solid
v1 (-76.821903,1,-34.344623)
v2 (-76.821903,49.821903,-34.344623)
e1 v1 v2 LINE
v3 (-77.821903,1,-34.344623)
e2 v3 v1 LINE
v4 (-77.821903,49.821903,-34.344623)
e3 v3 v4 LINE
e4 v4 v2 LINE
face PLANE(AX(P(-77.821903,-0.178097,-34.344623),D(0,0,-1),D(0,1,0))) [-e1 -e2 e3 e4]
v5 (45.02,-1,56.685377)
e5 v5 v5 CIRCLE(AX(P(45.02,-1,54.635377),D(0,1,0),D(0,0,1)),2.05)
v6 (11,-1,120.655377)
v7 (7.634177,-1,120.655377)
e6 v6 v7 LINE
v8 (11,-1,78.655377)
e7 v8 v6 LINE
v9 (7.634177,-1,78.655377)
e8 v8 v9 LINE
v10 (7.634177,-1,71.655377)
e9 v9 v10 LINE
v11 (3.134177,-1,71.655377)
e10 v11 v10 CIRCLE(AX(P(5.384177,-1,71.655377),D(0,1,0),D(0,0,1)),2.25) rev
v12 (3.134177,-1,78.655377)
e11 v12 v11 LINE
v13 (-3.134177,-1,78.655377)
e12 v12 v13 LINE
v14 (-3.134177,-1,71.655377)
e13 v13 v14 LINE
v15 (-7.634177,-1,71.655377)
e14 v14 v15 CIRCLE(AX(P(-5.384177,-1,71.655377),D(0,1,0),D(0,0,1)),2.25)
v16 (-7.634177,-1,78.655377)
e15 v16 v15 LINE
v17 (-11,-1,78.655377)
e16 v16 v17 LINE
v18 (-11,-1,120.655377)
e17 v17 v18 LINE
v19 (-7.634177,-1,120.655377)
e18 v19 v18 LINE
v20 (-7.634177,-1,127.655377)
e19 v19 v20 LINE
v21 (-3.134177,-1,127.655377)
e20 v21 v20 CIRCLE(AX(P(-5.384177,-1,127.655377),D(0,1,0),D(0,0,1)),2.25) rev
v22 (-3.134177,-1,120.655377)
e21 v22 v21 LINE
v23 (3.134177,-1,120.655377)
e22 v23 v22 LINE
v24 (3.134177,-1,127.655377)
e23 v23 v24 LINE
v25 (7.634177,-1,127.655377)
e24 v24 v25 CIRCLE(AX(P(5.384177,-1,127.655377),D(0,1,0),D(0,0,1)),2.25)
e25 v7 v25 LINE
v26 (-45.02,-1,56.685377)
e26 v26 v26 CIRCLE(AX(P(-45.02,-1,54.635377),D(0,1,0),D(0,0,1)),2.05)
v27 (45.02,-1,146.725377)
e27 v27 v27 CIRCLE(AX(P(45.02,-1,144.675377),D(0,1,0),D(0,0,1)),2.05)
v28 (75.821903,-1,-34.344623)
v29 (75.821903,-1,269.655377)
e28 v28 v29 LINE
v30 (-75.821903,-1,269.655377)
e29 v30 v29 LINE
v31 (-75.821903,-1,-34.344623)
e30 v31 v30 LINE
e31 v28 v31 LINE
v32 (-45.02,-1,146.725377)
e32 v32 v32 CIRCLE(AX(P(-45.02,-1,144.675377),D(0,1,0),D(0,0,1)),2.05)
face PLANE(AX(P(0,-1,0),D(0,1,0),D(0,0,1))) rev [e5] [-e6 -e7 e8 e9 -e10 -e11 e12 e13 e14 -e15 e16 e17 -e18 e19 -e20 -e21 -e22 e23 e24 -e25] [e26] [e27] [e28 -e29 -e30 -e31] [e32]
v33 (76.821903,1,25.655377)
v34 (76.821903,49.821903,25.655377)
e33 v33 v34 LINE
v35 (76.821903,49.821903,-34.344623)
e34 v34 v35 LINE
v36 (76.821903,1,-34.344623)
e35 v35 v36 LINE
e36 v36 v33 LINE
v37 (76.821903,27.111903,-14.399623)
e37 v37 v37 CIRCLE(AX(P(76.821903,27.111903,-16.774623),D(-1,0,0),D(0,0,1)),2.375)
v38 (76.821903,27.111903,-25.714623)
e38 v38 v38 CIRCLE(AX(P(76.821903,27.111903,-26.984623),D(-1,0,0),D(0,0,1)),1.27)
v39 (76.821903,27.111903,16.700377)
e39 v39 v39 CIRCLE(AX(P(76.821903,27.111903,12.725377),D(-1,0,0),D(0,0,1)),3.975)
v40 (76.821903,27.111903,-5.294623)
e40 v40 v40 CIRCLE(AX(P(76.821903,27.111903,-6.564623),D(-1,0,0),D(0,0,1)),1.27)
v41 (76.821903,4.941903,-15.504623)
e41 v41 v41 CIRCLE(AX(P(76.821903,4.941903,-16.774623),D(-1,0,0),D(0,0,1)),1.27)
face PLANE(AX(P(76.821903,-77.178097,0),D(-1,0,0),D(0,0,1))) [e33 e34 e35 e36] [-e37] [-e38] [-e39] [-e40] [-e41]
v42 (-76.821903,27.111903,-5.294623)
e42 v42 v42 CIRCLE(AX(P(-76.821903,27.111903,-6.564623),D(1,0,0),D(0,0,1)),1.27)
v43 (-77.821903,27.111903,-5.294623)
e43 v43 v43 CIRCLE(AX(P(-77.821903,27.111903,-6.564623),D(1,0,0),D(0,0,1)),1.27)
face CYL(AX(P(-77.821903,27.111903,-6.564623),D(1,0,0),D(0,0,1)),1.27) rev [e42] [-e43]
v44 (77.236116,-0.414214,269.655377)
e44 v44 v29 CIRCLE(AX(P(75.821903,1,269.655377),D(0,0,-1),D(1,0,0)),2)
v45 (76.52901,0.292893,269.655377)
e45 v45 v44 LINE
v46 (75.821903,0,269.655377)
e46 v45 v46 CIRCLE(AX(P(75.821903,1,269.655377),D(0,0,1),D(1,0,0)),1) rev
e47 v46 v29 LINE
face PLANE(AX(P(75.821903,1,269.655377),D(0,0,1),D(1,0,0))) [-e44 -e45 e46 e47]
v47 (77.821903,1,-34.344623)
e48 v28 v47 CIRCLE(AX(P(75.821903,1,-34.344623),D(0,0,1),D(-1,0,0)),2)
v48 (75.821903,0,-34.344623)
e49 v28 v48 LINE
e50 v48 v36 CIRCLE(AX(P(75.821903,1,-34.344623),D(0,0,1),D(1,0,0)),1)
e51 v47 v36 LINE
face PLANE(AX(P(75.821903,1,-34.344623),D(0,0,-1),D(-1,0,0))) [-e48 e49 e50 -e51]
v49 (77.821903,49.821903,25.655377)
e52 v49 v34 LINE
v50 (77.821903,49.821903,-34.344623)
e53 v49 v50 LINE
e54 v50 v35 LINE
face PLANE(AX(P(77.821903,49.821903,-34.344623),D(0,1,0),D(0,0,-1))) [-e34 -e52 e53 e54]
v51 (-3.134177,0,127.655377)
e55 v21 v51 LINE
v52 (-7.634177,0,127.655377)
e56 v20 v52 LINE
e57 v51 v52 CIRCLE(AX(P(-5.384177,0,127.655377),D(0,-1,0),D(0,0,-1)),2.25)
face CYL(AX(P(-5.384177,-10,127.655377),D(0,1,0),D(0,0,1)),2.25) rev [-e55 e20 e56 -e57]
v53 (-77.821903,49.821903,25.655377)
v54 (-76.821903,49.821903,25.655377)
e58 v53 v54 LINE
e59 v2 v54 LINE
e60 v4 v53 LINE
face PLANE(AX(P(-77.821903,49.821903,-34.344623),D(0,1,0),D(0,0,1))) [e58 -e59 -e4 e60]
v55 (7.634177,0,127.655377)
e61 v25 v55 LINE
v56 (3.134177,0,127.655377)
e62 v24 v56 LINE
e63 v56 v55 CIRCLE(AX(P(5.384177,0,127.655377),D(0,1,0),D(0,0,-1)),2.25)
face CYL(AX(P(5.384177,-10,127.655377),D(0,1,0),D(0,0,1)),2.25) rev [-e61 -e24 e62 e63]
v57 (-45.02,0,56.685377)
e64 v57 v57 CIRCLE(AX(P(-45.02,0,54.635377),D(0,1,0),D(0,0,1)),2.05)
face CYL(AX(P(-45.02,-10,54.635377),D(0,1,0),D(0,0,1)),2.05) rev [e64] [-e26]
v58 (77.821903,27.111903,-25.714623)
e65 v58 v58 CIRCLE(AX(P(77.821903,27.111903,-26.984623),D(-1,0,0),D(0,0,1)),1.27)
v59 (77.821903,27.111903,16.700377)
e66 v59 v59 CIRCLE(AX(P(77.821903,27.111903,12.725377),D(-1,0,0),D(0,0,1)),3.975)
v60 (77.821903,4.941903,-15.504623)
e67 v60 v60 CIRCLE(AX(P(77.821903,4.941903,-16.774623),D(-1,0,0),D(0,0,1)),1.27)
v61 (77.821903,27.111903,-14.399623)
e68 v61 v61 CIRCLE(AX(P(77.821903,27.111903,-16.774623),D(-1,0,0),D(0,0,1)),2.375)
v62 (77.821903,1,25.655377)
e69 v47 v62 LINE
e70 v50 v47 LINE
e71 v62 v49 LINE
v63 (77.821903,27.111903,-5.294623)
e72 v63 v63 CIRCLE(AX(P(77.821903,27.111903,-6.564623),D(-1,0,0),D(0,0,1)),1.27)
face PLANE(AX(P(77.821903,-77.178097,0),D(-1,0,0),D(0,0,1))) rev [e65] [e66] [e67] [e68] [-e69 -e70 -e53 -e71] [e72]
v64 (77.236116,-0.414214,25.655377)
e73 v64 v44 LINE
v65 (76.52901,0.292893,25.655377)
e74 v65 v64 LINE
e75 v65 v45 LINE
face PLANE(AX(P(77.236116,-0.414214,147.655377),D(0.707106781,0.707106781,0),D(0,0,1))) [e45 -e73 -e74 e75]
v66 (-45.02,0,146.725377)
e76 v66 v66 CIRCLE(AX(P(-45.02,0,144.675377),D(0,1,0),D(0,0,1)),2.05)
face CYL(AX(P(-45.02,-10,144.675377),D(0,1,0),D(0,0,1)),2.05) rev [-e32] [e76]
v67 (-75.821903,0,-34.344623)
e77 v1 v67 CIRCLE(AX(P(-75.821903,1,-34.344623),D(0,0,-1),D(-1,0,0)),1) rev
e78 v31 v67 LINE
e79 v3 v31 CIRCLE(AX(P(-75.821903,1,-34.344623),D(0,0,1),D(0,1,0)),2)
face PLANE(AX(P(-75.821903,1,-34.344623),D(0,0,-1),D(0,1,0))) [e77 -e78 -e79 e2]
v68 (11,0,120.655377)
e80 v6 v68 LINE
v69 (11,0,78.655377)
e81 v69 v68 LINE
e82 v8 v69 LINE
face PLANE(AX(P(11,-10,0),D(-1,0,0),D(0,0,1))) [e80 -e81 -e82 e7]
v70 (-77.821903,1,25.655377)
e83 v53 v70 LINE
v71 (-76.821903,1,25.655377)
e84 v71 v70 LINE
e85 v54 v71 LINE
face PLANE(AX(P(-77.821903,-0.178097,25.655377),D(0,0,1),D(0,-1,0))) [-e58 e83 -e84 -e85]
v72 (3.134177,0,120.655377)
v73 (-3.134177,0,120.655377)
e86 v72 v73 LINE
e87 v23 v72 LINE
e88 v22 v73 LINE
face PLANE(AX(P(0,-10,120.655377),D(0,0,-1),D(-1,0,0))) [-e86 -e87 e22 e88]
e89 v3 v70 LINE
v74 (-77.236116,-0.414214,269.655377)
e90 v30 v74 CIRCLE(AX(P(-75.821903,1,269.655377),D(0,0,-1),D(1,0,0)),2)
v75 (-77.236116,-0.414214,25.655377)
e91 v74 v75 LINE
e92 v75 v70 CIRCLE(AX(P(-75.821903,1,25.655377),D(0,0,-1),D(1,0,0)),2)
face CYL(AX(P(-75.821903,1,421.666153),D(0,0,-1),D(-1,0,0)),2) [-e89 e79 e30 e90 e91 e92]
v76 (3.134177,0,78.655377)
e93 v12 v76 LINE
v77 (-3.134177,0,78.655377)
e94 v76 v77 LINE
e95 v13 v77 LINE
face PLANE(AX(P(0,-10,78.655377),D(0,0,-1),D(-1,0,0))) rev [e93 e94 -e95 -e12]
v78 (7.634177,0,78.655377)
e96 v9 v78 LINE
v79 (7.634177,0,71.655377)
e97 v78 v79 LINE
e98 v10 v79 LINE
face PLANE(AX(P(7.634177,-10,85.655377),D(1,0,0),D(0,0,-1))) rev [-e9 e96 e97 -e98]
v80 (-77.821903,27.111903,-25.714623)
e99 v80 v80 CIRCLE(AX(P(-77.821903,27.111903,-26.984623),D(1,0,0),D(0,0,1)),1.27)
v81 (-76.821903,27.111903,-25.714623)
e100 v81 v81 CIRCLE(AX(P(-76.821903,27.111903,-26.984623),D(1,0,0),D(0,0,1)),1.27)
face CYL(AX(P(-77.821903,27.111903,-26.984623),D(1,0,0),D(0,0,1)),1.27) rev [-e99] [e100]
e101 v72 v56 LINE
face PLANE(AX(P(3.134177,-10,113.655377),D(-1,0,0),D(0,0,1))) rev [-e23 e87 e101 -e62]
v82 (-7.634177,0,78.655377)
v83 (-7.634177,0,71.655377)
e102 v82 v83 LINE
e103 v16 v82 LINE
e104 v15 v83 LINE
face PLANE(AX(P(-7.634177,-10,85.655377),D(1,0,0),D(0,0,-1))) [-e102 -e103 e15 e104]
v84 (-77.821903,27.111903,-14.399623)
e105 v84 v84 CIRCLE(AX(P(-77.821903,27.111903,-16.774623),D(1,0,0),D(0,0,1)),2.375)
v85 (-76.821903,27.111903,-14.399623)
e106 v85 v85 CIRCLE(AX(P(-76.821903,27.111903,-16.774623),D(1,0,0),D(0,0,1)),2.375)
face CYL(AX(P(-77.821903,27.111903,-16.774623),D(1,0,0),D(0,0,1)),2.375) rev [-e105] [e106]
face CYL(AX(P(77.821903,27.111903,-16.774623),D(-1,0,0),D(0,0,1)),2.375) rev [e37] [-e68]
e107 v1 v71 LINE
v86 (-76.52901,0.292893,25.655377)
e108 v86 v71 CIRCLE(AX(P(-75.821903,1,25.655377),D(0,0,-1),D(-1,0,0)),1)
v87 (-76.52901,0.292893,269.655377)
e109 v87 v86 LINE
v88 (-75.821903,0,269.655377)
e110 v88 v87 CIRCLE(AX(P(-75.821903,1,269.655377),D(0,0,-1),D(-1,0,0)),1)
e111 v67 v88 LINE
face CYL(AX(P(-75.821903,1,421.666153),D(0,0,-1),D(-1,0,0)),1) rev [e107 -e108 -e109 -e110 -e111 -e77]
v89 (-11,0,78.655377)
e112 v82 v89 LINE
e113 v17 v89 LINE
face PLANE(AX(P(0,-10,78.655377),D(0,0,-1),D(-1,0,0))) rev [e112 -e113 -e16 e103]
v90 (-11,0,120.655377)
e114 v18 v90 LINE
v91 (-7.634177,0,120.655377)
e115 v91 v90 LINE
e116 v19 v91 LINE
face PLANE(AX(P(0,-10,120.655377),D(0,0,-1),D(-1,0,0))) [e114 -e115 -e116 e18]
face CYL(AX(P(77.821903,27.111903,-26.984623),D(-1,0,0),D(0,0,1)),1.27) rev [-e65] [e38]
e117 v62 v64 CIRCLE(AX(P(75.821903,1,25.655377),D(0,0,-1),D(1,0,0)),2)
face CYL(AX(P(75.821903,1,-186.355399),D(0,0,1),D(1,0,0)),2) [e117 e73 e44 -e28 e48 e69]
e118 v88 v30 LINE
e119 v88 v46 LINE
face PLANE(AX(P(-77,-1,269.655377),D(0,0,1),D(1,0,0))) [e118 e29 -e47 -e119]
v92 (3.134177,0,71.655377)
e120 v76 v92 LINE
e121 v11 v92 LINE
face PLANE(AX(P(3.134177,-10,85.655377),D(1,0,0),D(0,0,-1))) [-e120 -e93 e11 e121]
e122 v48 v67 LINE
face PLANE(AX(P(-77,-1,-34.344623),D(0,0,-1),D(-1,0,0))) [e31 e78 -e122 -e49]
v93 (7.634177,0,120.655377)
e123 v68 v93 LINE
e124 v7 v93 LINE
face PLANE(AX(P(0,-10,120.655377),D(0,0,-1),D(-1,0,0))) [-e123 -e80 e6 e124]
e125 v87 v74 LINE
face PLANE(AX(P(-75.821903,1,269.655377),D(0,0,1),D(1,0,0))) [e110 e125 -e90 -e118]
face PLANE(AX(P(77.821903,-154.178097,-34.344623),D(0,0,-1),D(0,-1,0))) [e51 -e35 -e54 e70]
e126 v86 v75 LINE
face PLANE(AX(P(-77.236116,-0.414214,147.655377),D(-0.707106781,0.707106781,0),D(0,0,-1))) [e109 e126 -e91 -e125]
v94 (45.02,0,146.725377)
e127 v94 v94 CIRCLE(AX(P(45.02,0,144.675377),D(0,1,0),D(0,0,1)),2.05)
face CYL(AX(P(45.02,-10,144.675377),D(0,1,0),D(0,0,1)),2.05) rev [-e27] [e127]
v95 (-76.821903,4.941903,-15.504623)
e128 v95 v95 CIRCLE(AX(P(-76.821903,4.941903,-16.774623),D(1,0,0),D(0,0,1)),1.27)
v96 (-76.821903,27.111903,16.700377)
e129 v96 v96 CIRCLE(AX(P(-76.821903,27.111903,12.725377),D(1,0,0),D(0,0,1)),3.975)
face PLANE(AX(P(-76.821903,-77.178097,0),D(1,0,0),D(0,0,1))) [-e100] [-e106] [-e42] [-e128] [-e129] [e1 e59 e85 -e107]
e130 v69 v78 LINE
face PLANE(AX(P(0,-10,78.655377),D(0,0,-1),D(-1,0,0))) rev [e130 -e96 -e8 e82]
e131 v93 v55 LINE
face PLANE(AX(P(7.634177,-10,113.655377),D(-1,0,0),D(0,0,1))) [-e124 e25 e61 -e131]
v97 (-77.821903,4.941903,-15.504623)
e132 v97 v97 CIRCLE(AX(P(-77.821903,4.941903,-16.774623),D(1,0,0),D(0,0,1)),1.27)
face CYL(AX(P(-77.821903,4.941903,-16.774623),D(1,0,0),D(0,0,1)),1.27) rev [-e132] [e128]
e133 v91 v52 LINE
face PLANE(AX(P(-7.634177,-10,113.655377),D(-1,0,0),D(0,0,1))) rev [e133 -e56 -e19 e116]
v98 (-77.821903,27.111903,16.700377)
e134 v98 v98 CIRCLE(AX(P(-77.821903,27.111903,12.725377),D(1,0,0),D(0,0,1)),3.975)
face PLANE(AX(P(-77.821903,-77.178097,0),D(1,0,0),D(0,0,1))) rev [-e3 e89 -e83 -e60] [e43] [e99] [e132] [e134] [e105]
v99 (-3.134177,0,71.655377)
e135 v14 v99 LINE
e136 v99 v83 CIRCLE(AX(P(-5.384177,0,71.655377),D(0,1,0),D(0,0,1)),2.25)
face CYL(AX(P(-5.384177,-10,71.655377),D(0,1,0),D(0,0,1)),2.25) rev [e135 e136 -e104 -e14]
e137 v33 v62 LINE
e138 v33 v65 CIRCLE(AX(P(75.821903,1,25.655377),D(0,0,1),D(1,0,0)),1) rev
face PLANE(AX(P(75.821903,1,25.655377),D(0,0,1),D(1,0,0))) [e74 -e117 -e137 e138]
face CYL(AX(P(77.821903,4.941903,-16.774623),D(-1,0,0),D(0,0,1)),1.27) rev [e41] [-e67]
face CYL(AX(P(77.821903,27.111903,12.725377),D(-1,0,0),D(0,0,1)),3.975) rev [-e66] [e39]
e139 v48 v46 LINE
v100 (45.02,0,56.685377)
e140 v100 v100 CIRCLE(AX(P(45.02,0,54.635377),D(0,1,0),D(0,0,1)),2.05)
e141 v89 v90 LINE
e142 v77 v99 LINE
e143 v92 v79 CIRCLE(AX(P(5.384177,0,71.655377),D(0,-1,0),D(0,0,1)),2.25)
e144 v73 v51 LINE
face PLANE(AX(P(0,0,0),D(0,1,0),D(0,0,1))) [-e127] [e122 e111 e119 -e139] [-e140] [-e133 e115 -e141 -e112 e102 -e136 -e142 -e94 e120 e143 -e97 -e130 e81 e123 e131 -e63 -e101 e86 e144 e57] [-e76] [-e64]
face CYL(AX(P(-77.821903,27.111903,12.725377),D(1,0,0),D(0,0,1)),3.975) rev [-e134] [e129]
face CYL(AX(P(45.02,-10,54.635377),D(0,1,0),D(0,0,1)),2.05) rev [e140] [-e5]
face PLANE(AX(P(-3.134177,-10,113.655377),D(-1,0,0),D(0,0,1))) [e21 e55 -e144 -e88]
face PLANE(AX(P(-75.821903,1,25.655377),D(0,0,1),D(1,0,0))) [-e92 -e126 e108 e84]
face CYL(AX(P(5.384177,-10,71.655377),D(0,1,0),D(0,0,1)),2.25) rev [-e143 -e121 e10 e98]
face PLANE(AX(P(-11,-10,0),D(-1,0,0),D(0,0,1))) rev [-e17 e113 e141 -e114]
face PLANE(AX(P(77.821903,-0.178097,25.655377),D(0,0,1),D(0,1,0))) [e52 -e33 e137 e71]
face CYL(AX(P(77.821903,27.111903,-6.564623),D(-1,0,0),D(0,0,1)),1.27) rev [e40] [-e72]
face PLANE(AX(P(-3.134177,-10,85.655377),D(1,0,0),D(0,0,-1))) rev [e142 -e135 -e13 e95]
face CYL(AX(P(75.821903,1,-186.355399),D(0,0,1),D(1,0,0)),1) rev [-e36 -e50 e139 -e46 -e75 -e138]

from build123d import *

# Parameters (mm, degrees)
SKETCH1_W                    = 154
SKETCH1_H                    = 304
BASE_FLANGE1_DEPTH           = 1
SKETCH4_W                    = 22
SKETCH4_H                    = 42
CUT_EXTRUDE3_DEPTH           = 10
MIRROR2_COPY_1_SKETCH_W      = 22
MIRROR2_COPY_1_SKETCH_H      = 42
MIRROR2_COPY_1_DEPTH         = 10
SKETCH2_R                    = 2.05
CUT_EXTRUDE4_DEPTH           = 10
SKETCH10_W                   = 50
SKETCH10_H                   = 60
BOSS_EXTRUDE2_DEPTH          = 1
SKETCH11_R                   = 3.975
SKETCH11_R_2                 = 1.27
SKETCH11_R_3                 = 2.375
CUT_EXTRUDE6_DEPTH           = 1
SKETCH12_R                   = 1.27
CUT_EXTRUDE7_DEPTH           = 1
SKETCH13_R                   = 3.975
SKETCH13_R_2                 = 1.27
SKETCH13_R_3                 = 2.375
CUT_EXTRUDE8_DEPTH           = 1
SKETCHED_START               = -127
SKETCHED_BEND1_OUTLINE_W     = 1
SKETCHED_BEND1_OUTLINE_H     = 60
SKETCHED_BEND1_DEPTH         = 49.366857245
SKETCHED_START_2             = -77.689070906
SKETCHED_BEND1_2_OUTLINE_W   = 49.821902755
SKETCHED_BEND1_2_OUTLINE_H   = 60
SKETCHED_BEND1_2_OUTLINE_R   = 1.27
SKETCHED_BEND1_2_OUTLINE_R_2 = 2.375
SKETCHED_BEND1_2_OUTLINE_R_3 = 3.975
SKETCHED_BEND1_2_DEPTH       = 0.867168151
SKETCHED_START_3             = -77
SKETCHED_BEND1_3_OUTLINE_W   = 49.821902755
SKETCHED_BEND1_3_OUTLINE_H   = 60
SKETCHED_BEND1_3_OUTLINE_R   = 1.27
SKETCHED_BEND1_3_OUTLINE_R_2 = 2.375
SKETCHED_BEND1_3_OUTLINE_R_3 = 3.975
SKETCHED_BEND1_3_DEPTH       = 1.178097245
SKETCHED_START_4             = -77.821902755
SKETCHED_BEND1_4_OUTLINE_W   = 49.821902755
SKETCHED_BEND1_4_OUTLINE_H   = 60
SKETCHED_BEND1_4_OUTLINE_R   = 1.27
SKETCHED_BEND1_4_OUTLINE_R_2 = 2.375
SKETCHED_BEND1_4_OUTLINE_R_3 = 3.975
SKETCHED_BEND1_4_DEPTH       = 0.132831849
SKETCHED_START_5             = -35
SKETCHED_BEND1_5_DEPTH       = 304.655376963
SKETCHED_START_6             = 25.655376963
SKETCHED_BEND1_6_DEPTH       = 244
SKETCHED_BEND1_7_DEPTH       = 244
SKETCHED_START_7             = 77.616422755
SKETCHED_BEND2_OUTLINE_W     = 1
SKETCHED_BEND2_OUTLINE_H     = 60
SKETCHED_BEND2_DEPTH         = 49.383577245
SKETCHED_START_8             = 76.821902755
SKETCHED_BEND2_2_OUTLINE_W   = 49.821902755
SKETCHED_BEND2_2_OUTLINE_H   = 60
SKETCHED_BEND2_2_OUTLINE_R   = 1.27
SKETCHED_BEND2_2_OUTLINE_R_2 = 2.375
SKETCHED_BEND2_2_OUTLINE_R_3 = 3.975
SKETCHED_BEND2_2_DEPTH       = 0.414213562
SKETCHED_START_9             = 75.821902755
SKETCHED_BEND2_3_OUTLINE_W   = 49.821902755
SKETCHED_BEND2_3_OUTLINE_H   = 60
SKETCHED_BEND2_3_OUTLINE_R   = 1.27
SKETCHED_BEND2_3_OUTLINE_R_2 = 2.375
SKETCHED_BEND2_3_OUTLINE_R_3 = 3.975
SKETCHED_BEND2_3_DEPTH       = 2
SKETCHED_BEND2_4_DEPTH       = 304.655376963
SKETCHED_BEND2_5_DEPTH       = 244
SKETCHED_BEND2_6_DEPTH       = 244


with BuildPart() as part:
    # Base-Flange1: sheet metal written as solids
    # Sketch1 → Base-Flange1 (new body)
    with BuildSketch(Plane(origin=(0, 0, 0), x_dir=(1, 0, 0), z_dir=(0, 1, 0))):
        with Locations((0, -117.655376963)):
            Rectangle(SKETCH1_W, SKETCH1_H)
    extrude(amount=-BASE_FLANGE1_DEPTH)

    # Sketch4 → Cut-Extrude3 (cut)
    with BuildSketch(Plane(origin=(0, 0, 0), x_dir=(1, 0, 0), z_dir=(0, 1, 0))):
        with Locations((0, -99.655376963)):
            Rectangle(SKETCH4_W, SKETCH4_H)
        with BuildLine():
            Line((-7.634176778, -85.655376963), (-7.634176778, -71.655376963))
            ThreePointArc((-7.634176778, -71.655376963), (-5.384176778, -69.405376963), (-3.134176778, -71.655376963))
            Line((-3.134176778, -71.655376963), (-3.134176778, -85.655376963))
            ThreePointArc((-3.134176778, -85.655376963), (-5.384176778, -87.905376963), (-7.634176778, -85.655376963))
        make_face()
    cut_extrude3 = extrude(amount=-CUT_EXTRUDE3_DEPTH, mode=Mode.SUBTRACT)

    # Mirror1: Cut-Extrude3 across plane
    add(cut_extrude3.mirror(Plane(origin=(0, 0, 0), x_dir=(0, 0, 1), z_dir=(1, 0, 0))), mode=Mode.SUBTRACT)

    # Mirror2: Cut-Extrude3 across plane
    add(cut_extrude3.mirror(Plane(origin=(0, 0, 99.655376963), x_dir=(1, 0, 0), z_dir=(0, 0, -1))), mode=Mode.SUBTRACT)

    # Mirror2 copy 1 sketch → Mirror2 copy 1 (cut)
    with BuildSketch(Plane(origin=(0, 0, 199.310753926), x_dir=(-1, 0, 0), z_dir=(0, 1, 0))):
        with Locations((0, -99.655376963)):
            Rectangle(MIRROR2_COPY_1_SKETCH_W, MIRROR2_COPY_1_SKETCH_H)
        with BuildLine():
            Line((-7.634176778, -85.655376963), (-7.634176778, -71.655376963))
            ThreePointArc((-7.634176778, -71.655376963), (-5.384176778, -69.405376963), (-3.134176778, -71.655376963))
            Line((-3.134176778, -71.655376963), (-3.134176778, -85.655376963))
            ThreePointArc((-3.134176778, -85.655376963), (-5.384176778, -87.905376963), (-7.634176778, -85.655376963))
        make_face()
    extrude(amount=-MIRROR2_COPY_1_DEPTH, mode=Mode.SUBTRACT)

    # Sketch2 → Cut-Extrude4 (cut)
    with BuildSketch(Plane(origin=(0, 0, 0), x_dir=(1, 0, 0), z_dir=(0, 1, 0))):
        with Locations(Location((-45.02, -144.67537696, 0), (0, 0, 270))):
            Circle(SKETCH2_R)
        with Locations(Location((-45.02, -54.63537696, 0), (0, 0, 270))):
            Circle(SKETCH2_R)
        with Locations(Location((45.02, -54.63537696, 0), (0, 0, 270))):
            Circle(SKETCH2_R)
        with Locations(Location((45.02, -144.67537696, 0), (0, 0, 270))):
            Circle(SKETCH2_R)
    extrude(amount=-CUT_EXTRUDE4_DEPTH, mode=Mode.SUBTRACT)

    # Sketch10 → Boss-Extrude2 (add)
    with BuildSketch(Plane(origin=(0, 0, 0), x_dir=(1, 0, 0), z_dir=(0, 1, 0))):
        with Locations((-102, 4.344623037)):
            Rectangle(SKETCH10_W, SKETCH10_H)
        with Locations((102, 4.344623037)):
            Rectangle(SKETCH10_W, SKETCH10_H)
    extrude(amount=-BOSS_EXTRUDE2_DEPTH)

    # Sketch11 → Cut-Extrude6 (cut)
    with BuildSketch(Plane(origin=(0, 0, 0), x_dir=(1, 0, 0), z_dir=(0, 1, 0))):
        with Locations(Location((104.29, -12.725376963, 0), (0, 0, 270))):
            Circle(SKETCH11_R)
        with Locations(Location((104.29, 6.564623037, 0), (0, 0, 270))):
            Circle(SKETCH11_R_2)
        with Locations(Location((104.29, 16.774623037, 0), (0, 0, 270))):
            Circle(SKETCH11_R_3)
        with Locations(Location((104.29, 26.984623037, 0), (0, 0, 270))):
            Circle(SKETCH11_R_2)
    extrude(amount=-CUT_EXTRUDE6_DEPTH, mode=Mode.SUBTRACT)

    # Sketch12 → Cut-Extrude7 (cut)
    with BuildSketch(Plane(origin=(0, 0, 0), x_dir=(1, 0, 0), z_dir=(0, 1, 0))):
        with Locations(Location((82.12, 16.774623037, 0), (0, 0, 270))):
            Circle(SKETCH12_R)
    extrude(amount=-CUT_EXTRUDE7_DEPTH, mode=Mode.SUBTRACT)

    # Sketch13 → Cut-Extrude8 (cut)
    with BuildSketch(Plane(origin=(0, 0, 0), x_dir=(1, 0, 0), z_dir=(0, 1, 0))):
        with Locations(Location((-104.29, -12.725376963, 0), (0, 0, 270))):
            Circle(SKETCH13_R)
        with Locations(Location((-104.29, 6.564623037, 0), (0, 0, 270))):
            Circle(SKETCH13_R_2)
        with Locations(Location((-104.29, 16.774623037, 0), (0, 0, 270))):
            Circle(SKETCH13_R_3)
        with Locations(Location((-82.12, 16.774623037, 0), (0, 0, 270))):
            Circle(SKETCH13_R_2)
        with Locations(Location((-104.29, 26.984623037, 0), (0, 0, 270))):
            Circle(SKETCH13_R_2)
    extrude(amount=-CUT_EXTRUDE8_DEPTH, mode=Mode.SUBTRACT)

    # Sketched Bend1: read off the stored shape, not the designer's step
    # Sketched Bend1 outline → Sketched Bend1 (cut)
    with BuildSketch(Plane.YZ.offset(SKETCHED_START)):
        with Locations((-0.5, -4.344623037)):
            Rectangle(SKETCHED_BEND1_OUTLINE_W, SKETCHED_BEND1_OUTLINE_H)
    extrude(amount=SKETCHED_BEND1_DEPTH, mode=Mode.SUBTRACT)

    # Sketched Bend1 2 outline → Sketched Bend1 2 (add)
    with BuildSketch(Plane.YZ.offset(SKETCHED_START_2)):
        with Locations((24.910951378, -4.344623037)):
            Rectangle(SKETCHED_BEND1_2_OUTLINE_W, SKETCHED_BEND1_2_OUTLINE_H)
        with Locations((4.941902755, -16.774623037)):
            Circle(SKETCHED_BEND1_2_OUTLINE_R, mode=Mode.SUBTRACT)
        with Locations((27.111902755, -26.984623037)):
            Circle(SKETCHED_BEND1_2_OUTLINE_R, mode=Mode.SUBTRACT)
        with Locations((27.111902755, -16.774623037)):
            Circle(SKETCHED_BEND1_2_OUTLINE_R_2, mode=Mode.SUBTRACT)
        with Locations((27.111902755, -6.564623037)):
            Circle(SKETCHED_BEND1_2_OUTLINE_R, mode=Mode.SUBTRACT)
        with Locations((27.111902755, 12.725376963)):
            Circle(SKETCHED_BEND1_2_OUTLINE_R_3, mode=Mode.SUBTRACT)
    extrude(amount=SKETCHED_BEND1_2_DEPTH)

    # Sketched Bend1 3 outline → Sketched Bend1 3 (add)
    with BuildSketch(Plane.YZ.offset(SKETCHED_START_3)):
        with Locations((24.910951378, -4.344623037)):
            Rectangle(SKETCHED_BEND1_3_OUTLINE_W, SKETCHED_BEND1_3_OUTLINE_H)
        with Locations((4.941902755, -16.774623037)):
            Circle(SKETCHED_BEND1_3_OUTLINE_R, mode=Mode.SUBTRACT)
        with Locations((27.111902755, -26.984623037)):
            Circle(SKETCHED_BEND1_3_OUTLINE_R, mode=Mode.SUBTRACT)
        with Locations((27.111902755, -16.774623037)):
            Circle(SKETCHED_BEND1_3_OUTLINE_R_2, mode=Mode.SUBTRACT)
        with Locations((27.111902755, -6.564623037)):
            Circle(SKETCHED_BEND1_3_OUTLINE_R, mode=Mode.SUBTRACT)
        with Locations((27.111902755, 12.725376963)):
            Circle(SKETCHED_BEND1_3_OUTLINE_R_3, mode=Mode.SUBTRACT)
    extrude(amount=SKETCHED_BEND1_3_DEPTH)

    # Sketched Bend1 4 outline → Sketched Bend1 4 (add)
    with BuildSketch(Plane.YZ.offset(SKETCHED_START_4)):
        with Locations((24.910951378, -4.344623037)):
            Rectangle(SKETCHED_BEND1_4_OUTLINE_W, SKETCHED_BEND1_4_OUTLINE_H)
        with Locations((4.941902755, -16.774623037)):
            Circle(SKETCHED_BEND1_4_OUTLINE_R, mode=Mode.SUBTRACT)
        with Locations((27.111902755, -26.984623037)):
            Circle(SKETCHED_BEND1_4_OUTLINE_R, mode=Mode.SUBTRACT)
        with Locations((27.111902755, -16.774623037)):
            Circle(SKETCHED_BEND1_4_OUTLINE_R_2, mode=Mode.SUBTRACT)
        with Locations((27.111902755, -6.564623037)):
            Circle(SKETCHED_BEND1_4_OUTLINE_R, mode=Mode.SUBTRACT)
        with Locations((27.111902755, 12.725376963)):
            Circle(SKETCHED_BEND1_4_OUTLINE_R_3, mode=Mode.SUBTRACT)
    extrude(amount=SKETCHED_BEND1_4_DEPTH)

    # Sketched Bend1 5 outline → Sketched Bend1 5 (cut)
    with BuildSketch(Plane.XY.offset(SKETCHED_START_5)):
        with BuildLine():
            Line((-76.821902755, 49.821902755), (-76.821902755, 1))
            ThreePointArc((-76.821902755, 1), (-76.529009536, 0.292893219), (-75.821902755, 0))
            Line((-75.821902755, 0), (-75.821902755, 49.821902755))
            Line((-75.821902755, 49.821902755), (-76.821902755, 49.821902755))
        make_face()
        with BuildLine():
            Line((-77.821902755, 1), (-77.821902755, 0))
            Line((-77.821902755, 0), (-77.633142755, 0))
            Line((-77.633142755, 0), (-77.633142755, -1))
            Line((-77.633142755, -1), (-75.821902755, -1))
            ThreePointArc((-75.821902755, -1), (-77.236116317, -0.414213562), (-77.821902755, 1))
        make_face()
    extrude(amount=SKETCHED_BEND1_5_DEPTH, mode=Mode.SUBTRACT)

    # Sketched Bend1 6 outline → Sketched Bend1 6 (cut)
    with BuildSketch(Plane.XY.offset(SKETCHED_START_6)):
        Polygon((-77, -0.178097245), (-76.821902755, 0), (-77, 0), align=None)
    extrude(amount=SKETCHED_BEND1_6_DEPTH, mode=Mode.SUBTRACT)

    # Sketched Bend1 7 outline → Sketched Bend1 7 (add)
    with BuildSketch(Plane.XY.offset(SKETCHED_START_6)):
        with BuildLine():
            ThreePointArc((-75.821902755, 0), (-76.204586187, 0.076120468), (-76.529009536, 0.292893219))
            Line((-76.529009536, 0.292893219), (-76.821902755, 0))
            Line((-76.821902755, 0), (-75.821902755, 0))
        make_face()
        with BuildLine():
            Line((-77, -0.616195186), (-77, -0.178097245))
            Line((-77, -0.178097245), (-77.236116317, -0.414213562))
            ThreePointArc((-77.236116317, -0.414213562), (-77.121986588, -0.519796705), (-77, -0.616195186))
        make_face()
    extrude(amount=SKETCHED_BEND1_7_DEPTH)

    # Sketched Bend2: read off the stored shape, not the designer's step
    # Sketched Bend2 outline → Sketched Bend2 (cut)
    with BuildSketch(Plane.YZ.offset(SKETCHED_START_7)):
        with Locations((-0.5, -4.344623037)):
            Rectangle(SKETCHED_BEND2_OUTLINE_W, SKETCHED_BEND2_OUTLINE_H)
    extrude(amount=SKETCHED_BEND2_DEPTH, mode=Mode.SUBTRACT)

    # Sketched Bend2 2 outline → Sketched Bend2 2 (add)
    with BuildSketch(Plane.YZ.offset(SKETCHED_START_8)):
        with Locations((24.910951378, -4.344623037)):
            Rectangle(SKETCHED_BEND2_2_OUTLINE_W, SKETCHED_BEND2_2_OUTLINE_H)
        with Locations((4.941902755, -16.774623037)):
            Circle(SKETCHED_BEND2_2_OUTLINE_R, mode=Mode.SUBTRACT)
        with Locations((27.111902755, -26.984623037)):
            Circle(SKETCHED_BEND2_2_OUTLINE_R, mode=Mode.SUBTRACT)
        with Locations((27.111902755, -16.774623037)):
            Circle(SKETCHED_BEND2_2_OUTLINE_R_2, mode=Mode.SUBTRACT)
        with Locations((27.111902755, -6.564623037)):
            Circle(SKETCHED_BEND2_2_OUTLINE_R, mode=Mode.SUBTRACT)
        with Locations((27.111902755, 12.725376963)):
            Circle(SKETCHED_BEND2_2_OUTLINE_R_3, mode=Mode.SUBTRACT)
    extrude(amount=SKETCHED_BEND2_2_DEPTH)

    # Sketched Bend2 3 outline → Sketched Bend2 3 (add)
    with BuildSketch(Plane.YZ.offset(SKETCHED_START_9)):
        with Locations((24.910951378, -4.344623037)):
            Rectangle(SKETCHED_BEND2_3_OUTLINE_W, SKETCHED_BEND2_3_OUTLINE_H)
        with Locations((4.941902755, -16.774623037)):
            Circle(SKETCHED_BEND2_3_OUTLINE_R, mode=Mode.SUBTRACT)
        with Locations((27.111902755, -26.984623037)):
            Circle(SKETCHED_BEND2_3_OUTLINE_R, mode=Mode.SUBTRACT)
        with Locations((27.111902755, -16.774623037)):
            Circle(SKETCHED_BEND2_3_OUTLINE_R_2, mode=Mode.SUBTRACT)
        with Locations((27.111902755, -6.564623037)):
            Circle(SKETCHED_BEND2_3_OUTLINE_R, mode=Mode.SUBTRACT)
        with Locations((27.111902755, 12.725376963)):
            Circle(SKETCHED_BEND2_3_OUTLINE_R_3, mode=Mode.SUBTRACT)
    extrude(amount=SKETCHED_BEND2_3_DEPTH)

    # Sketched Bend2 4 outline → Sketched Bend2 4 (cut)
    with BuildSketch(Plane.XY.offset(SKETCHED_START_5)):
        with BuildLine():
            ThreePointArc((77.821902755, 1), (77.236116317, -0.414213562), (75.821902755, -1))
            Line((75.821902755, -1), (77.616422755, -1))
            Line((77.616422755, -1), (77.616422755, 0))
            Line((77.616422755, 0), (77.821902755, 0))
            Line((77.821902755, 0), (77.821902755, 1))
        make_face()
        with BuildLine():
            ThreePointArc((75.821902755, 0), (76.529009536, 0.292893219), (76.821902755, 1))
            Line((76.821902755, 1), (76.821902755, 49.821902755))
            Line((76.821902755, 49.821902755), (75.821902755, 49.821902755))
            Line((75.821902755, 49.821902755), (75.821902755, 0))
        make_face()
    extrude(amount=SKETCHED_BEND2_4_DEPTH, mode=Mode.SUBTRACT)

    # Sketched Bend2 5 outline → Sketched Bend2 5 (cut)
    with BuildSketch(Plane.XY.offset(SKETCHED_START_6)):
        Polygon((76.821902755, 0), (77, -0.178097245), (77, 0), align=None)
    extrude(amount=SKETCHED_BEND2_5_DEPTH, mode=Mode.SUBTRACT)

    # Sketched Bend2 6 outline → Sketched Bend2 6 (add)
    with BuildSketch(Plane.XY.offset(SKETCHED_START_6)):
        with BuildLine():
            ThreePointArc((77, -0.616195186), (77.121986588, -0.519796705), (77.236116317, -0.414213562))
            Line((77.236116317, -0.414213562), (77, -0.178097245))
            Line((77, -0.178097245), (77, -0.616195186))
        make_face()
        with BuildLine():
            Line((75.821902755, 0), (76.821902755, 0))
            Line((76.821902755, 0), (76.529009536, 0.292893219))
            ThreePointArc((76.529009536, 0.292893219), (76.204586187, 0.076120468), (75.821902755, 0))
        make_face()
    extrude(amount=SKETCHED_BEND2_6_DEPTH)


solid = part.part
